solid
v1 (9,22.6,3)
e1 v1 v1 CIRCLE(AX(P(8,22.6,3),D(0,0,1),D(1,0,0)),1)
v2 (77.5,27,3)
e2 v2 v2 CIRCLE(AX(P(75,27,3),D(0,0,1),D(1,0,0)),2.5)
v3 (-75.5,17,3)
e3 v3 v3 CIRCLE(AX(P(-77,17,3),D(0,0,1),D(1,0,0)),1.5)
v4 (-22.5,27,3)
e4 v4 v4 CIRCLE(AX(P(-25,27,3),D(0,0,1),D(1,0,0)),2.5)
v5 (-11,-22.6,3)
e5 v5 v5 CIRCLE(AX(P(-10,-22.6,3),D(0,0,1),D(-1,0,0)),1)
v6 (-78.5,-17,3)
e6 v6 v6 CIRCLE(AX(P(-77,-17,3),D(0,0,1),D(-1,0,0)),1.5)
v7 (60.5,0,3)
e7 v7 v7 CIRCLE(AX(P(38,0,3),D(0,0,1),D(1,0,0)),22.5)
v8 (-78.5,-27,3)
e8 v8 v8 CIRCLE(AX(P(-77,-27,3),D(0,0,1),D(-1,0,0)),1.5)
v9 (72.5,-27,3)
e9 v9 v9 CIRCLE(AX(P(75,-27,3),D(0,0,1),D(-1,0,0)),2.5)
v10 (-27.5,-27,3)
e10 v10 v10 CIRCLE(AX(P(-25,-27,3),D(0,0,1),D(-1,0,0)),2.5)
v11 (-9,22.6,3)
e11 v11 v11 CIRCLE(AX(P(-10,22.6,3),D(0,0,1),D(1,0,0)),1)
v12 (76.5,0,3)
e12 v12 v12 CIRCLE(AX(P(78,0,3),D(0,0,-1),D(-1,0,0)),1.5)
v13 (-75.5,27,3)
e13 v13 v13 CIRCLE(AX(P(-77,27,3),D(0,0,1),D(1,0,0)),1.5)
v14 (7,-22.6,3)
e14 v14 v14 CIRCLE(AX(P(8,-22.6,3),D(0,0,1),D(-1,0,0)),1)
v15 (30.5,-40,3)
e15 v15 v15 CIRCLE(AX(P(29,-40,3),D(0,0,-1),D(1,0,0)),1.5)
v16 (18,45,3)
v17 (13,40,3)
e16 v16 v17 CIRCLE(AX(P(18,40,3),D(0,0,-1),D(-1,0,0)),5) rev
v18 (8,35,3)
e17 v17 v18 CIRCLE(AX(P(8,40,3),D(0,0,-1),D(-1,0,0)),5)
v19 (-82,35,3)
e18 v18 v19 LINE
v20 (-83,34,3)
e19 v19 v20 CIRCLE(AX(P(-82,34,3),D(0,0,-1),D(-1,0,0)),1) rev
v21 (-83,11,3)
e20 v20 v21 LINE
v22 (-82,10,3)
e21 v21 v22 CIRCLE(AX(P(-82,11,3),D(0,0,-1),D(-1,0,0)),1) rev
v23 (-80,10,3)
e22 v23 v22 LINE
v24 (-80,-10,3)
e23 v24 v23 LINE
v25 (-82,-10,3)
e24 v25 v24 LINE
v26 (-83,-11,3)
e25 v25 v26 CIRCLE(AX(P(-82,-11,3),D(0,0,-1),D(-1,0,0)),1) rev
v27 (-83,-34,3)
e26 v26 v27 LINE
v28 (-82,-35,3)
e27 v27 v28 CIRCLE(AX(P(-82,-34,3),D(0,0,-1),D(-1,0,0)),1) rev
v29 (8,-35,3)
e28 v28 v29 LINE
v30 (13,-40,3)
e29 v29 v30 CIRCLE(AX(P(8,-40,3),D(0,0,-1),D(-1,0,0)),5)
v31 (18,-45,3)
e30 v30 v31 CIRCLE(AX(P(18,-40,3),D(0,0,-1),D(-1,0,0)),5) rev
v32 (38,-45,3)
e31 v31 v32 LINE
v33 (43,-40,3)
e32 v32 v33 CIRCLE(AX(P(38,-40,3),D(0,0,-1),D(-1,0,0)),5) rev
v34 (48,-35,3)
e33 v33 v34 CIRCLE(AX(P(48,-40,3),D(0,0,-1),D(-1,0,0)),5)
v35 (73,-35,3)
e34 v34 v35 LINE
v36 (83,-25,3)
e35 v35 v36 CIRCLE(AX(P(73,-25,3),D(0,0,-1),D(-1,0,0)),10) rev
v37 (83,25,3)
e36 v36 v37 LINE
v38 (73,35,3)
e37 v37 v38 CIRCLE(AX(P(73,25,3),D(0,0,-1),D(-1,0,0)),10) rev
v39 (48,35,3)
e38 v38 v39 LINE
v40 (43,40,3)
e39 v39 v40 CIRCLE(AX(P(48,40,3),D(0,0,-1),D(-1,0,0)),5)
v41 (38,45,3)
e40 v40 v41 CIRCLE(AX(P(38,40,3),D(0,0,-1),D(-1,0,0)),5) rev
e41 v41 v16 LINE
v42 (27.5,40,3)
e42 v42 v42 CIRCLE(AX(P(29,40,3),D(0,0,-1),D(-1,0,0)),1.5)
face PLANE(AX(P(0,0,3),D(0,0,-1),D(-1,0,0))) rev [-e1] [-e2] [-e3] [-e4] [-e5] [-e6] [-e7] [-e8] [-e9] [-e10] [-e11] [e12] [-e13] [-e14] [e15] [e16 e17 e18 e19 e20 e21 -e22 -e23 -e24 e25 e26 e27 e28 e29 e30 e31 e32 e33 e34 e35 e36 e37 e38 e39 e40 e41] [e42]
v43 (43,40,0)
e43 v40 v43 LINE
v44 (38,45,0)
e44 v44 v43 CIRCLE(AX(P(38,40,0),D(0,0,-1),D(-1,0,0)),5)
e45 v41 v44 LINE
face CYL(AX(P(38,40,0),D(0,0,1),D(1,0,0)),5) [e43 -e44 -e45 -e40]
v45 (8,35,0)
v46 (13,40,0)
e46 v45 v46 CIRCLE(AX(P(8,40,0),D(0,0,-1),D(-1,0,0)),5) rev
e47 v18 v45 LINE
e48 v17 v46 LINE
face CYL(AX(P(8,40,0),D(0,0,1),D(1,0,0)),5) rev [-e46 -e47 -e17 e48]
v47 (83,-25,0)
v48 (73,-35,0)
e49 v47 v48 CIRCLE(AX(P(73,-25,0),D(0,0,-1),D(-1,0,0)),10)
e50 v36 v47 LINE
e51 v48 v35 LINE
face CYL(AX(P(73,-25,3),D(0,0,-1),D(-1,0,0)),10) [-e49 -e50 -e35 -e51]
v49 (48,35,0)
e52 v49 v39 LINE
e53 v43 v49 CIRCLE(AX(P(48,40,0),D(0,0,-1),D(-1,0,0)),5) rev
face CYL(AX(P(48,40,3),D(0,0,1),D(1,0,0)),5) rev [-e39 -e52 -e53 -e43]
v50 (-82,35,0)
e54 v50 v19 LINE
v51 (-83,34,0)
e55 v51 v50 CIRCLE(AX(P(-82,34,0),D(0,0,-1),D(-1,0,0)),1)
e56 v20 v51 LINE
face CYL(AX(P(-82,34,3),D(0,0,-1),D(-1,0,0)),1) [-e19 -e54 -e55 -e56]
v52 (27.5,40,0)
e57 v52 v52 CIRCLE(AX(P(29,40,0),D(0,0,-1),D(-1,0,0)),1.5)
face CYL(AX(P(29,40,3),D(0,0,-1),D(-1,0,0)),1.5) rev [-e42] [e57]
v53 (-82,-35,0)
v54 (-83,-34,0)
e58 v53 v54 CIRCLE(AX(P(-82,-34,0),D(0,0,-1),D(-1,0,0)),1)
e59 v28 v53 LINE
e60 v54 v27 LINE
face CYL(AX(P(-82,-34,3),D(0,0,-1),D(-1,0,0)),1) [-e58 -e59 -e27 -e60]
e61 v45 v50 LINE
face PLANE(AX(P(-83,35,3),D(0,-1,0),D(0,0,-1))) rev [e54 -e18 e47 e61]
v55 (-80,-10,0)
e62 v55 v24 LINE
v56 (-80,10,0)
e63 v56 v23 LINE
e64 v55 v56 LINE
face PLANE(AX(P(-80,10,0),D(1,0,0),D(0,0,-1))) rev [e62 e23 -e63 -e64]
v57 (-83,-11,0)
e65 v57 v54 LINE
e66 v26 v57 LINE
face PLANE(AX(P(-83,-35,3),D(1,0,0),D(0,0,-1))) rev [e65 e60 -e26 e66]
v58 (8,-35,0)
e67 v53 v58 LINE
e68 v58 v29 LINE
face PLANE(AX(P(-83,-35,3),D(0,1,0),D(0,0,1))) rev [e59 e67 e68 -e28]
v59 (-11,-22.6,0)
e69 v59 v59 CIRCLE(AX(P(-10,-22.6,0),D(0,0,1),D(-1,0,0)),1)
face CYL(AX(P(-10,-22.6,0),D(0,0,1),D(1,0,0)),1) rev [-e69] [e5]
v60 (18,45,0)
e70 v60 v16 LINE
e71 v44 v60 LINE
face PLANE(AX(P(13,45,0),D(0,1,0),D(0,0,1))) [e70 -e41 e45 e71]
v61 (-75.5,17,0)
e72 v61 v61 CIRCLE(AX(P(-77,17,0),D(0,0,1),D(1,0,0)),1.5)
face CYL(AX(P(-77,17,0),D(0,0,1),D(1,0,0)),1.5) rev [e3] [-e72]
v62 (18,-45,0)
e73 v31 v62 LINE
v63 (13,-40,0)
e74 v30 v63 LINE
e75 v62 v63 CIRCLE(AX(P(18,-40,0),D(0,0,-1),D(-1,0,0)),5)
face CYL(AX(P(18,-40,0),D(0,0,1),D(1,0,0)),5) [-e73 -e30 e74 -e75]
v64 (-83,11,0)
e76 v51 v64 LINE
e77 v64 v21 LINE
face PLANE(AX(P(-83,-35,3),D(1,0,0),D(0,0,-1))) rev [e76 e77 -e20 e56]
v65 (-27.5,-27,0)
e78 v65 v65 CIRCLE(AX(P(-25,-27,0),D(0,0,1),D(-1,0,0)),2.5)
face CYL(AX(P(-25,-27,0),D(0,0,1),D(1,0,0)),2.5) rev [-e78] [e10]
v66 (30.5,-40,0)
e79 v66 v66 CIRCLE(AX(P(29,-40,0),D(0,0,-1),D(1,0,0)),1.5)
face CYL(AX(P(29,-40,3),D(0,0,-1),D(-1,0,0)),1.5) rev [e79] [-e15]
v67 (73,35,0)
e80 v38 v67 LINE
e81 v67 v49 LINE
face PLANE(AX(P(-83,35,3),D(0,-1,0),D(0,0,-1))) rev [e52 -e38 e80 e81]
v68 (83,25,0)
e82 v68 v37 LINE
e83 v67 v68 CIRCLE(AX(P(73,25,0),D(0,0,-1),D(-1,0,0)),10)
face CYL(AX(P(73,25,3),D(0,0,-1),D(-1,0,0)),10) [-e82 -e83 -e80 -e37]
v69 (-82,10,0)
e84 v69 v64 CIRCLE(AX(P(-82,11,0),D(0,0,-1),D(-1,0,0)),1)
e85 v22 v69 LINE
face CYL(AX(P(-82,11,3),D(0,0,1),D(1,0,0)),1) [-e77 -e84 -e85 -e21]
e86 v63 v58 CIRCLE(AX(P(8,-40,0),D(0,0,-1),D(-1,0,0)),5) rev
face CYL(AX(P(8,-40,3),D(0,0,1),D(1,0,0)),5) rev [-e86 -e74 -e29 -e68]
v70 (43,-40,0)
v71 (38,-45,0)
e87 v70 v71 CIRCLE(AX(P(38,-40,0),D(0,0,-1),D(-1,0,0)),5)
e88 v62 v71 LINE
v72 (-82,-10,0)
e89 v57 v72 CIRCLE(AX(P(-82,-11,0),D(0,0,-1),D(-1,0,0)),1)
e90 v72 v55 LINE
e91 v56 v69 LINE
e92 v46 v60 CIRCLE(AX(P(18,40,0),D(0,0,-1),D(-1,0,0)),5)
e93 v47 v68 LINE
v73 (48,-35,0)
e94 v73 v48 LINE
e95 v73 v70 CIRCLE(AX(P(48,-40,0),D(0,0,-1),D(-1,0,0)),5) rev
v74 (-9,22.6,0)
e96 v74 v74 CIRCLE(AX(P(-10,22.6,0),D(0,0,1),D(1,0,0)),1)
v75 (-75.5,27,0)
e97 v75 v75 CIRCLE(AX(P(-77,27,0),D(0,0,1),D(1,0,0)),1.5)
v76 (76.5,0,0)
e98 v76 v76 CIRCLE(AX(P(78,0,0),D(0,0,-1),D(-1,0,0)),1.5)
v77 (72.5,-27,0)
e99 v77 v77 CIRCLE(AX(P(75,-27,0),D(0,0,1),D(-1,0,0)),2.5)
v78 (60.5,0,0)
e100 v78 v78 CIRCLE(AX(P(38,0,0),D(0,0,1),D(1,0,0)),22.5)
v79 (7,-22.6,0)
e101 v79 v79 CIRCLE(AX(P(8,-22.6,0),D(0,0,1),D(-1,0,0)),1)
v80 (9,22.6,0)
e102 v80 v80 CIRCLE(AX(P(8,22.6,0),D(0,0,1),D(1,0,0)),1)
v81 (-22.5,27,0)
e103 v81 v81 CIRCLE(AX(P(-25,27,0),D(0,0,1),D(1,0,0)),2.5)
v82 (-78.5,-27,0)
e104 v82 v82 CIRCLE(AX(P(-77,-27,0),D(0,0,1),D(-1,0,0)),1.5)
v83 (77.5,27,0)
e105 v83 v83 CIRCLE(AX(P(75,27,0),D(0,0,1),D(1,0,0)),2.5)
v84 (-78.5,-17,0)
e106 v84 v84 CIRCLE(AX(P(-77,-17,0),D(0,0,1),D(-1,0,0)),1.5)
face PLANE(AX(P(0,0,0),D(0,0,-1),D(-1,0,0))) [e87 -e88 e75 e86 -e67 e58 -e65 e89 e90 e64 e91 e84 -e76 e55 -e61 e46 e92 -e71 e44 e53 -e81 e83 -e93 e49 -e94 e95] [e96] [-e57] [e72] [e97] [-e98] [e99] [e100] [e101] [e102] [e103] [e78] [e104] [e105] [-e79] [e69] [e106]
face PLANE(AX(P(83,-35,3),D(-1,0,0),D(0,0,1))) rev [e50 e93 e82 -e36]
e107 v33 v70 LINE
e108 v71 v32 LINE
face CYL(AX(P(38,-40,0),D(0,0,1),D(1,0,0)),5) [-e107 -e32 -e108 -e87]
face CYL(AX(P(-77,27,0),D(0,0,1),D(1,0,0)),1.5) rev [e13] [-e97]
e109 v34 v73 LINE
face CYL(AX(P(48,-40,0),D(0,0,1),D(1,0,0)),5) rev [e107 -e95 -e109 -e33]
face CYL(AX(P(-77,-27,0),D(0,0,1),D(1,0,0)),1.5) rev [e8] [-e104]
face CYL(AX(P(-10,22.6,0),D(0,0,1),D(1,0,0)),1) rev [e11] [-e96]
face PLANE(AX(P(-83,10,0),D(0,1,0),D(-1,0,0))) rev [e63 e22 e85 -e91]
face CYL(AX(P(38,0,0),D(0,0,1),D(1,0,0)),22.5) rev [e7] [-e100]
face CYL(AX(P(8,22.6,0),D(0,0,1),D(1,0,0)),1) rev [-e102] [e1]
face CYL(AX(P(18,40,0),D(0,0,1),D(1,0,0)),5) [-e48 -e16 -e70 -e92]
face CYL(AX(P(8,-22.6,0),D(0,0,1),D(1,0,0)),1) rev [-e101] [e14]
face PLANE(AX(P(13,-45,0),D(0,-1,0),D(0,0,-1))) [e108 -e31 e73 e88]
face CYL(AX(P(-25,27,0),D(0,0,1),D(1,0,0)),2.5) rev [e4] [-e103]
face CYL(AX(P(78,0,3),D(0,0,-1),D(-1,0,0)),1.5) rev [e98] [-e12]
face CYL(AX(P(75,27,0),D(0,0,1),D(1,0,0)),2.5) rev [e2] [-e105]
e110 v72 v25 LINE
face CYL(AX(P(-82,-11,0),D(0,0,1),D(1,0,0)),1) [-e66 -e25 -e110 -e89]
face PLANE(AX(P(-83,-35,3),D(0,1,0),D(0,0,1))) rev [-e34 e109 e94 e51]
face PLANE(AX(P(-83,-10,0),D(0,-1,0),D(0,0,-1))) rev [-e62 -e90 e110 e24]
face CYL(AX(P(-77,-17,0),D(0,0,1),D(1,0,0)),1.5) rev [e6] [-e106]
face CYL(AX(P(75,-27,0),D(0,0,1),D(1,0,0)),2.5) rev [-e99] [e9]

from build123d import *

# Parameters (mm, degrees)
SKETCH_1_W          = 166
SKETCH_1_H          = 70
EXTRUDE_1_DEPTH     = 3
SKETCH_2_W          = 3
SKETCH_2_H          = 20
CUT_EXTRUDE_1_DEPTH = 91.1276872
SKETCH_3_R          = 1.5
CUT_EXTRUDE_2_DEPTH = 91.1276872
SKETCH_4_R          = 1
CUT_EXTRUDE_3_DEPTH = 91.1276872
FILLET_1_R          = 1
SKETCH_5_R          = 22.5
CUT_EXTRUDE_4_DEPTH = 91.1276872
SKETCH_6_R          = 2.5
CUT_EXTRUDE_5_DEPTH = 91.1276872
FILLET_2_R          = 10
SKETCH_7_W          = 30
SKETCH_7_H          = 10
EXTRUDE_2_DEPTH     = 3
FILLET_START        = -1
FILLET_3_DEPTH      = 5
FILLET_3_2_DEPTH    = 3
SKETCH_8_R          = 1.5
CUT_EXTRUDE_6_DEPTH = 95.461632423
SKETCH_9_R          = 1.5
CUT_EXTRUDE_7_DEPTH = 95.461632423


with BuildPart() as part:
    # 草图1 → 凸台-拉伸1 (new body)
    with BuildSketch(Plane.XY):
        Rectangle(SKETCH_1_W, SKETCH_1_H)
    extrude(amount=EXTRUDE_1_DEPTH)

    # 草图2 → 切除-拉伸1 (cut, through all)
    with BuildSketch(Plane.XY.offset(3)):
        with Locations((-81.5, 0)):
            Rectangle(SKETCH_2_W, SKETCH_2_H)
    extrude(amount=-CUT_EXTRUDE_1_DEPTH, mode=Mode.SUBTRACT)

    # 草图3 → 切除-拉伸2 (cut, through all)
    with BuildSketch(Plane.XY.offset(3)):
        with Locations((-77, 27)):
            Circle(SKETCH_3_R)
        with Locations((-77, 17)):
            Circle(SKETCH_3_R)
        with Locations(Location((-77, -17, 0), (0, 0, 180))):
            Circle(SKETCH_3_R)
        with Locations(Location((-77, -27, 0), (0, 0, 180))):
            Circle(SKETCH_3_R)
    extrude(amount=-CUT_EXTRUDE_2_DEPTH, mode=Mode.SUBTRACT)

    # 草图4 → 切除-拉伸3 (cut, through all)
    with BuildSketch(Plane.XY.offset(3)):
        with Locations((-10, 22.6)):
            Circle(SKETCH_4_R)
        with Locations((8, 22.6)):
            Circle(SKETCH_4_R)
        with Locations(Location((8, -22.6, 0), (0, 0, 180))):
            Circle(SKETCH_4_R)
        with Locations(Location((-10, -22.6, 0), (0, 0, 180))):
            Circle(SKETCH_4_R)
    extrude(amount=-CUT_EXTRUDE_3_DEPTH, mode=Mode.SUBTRACT)

    # 圆角1
    fillet_1_edges = [part.edges().sort_by_distance(p)[0] for p in [
        (-83, -10, 1.5),
        (-83, 10, 1.5),
        (-83, -35, 1.5),
        (-83, 35, 1.5),
    ]]
    fillet(fillet_1_edges, radius=FILLET_1_R)

    # 草图5 → 切除-拉伸4 (cut, through all)
    with BuildSketch(Plane.XY.offset(3)):
        with Locations((38, 0)):
            Circle(SKETCH_5_R)
    extrude(amount=-CUT_EXTRUDE_4_DEPTH, mode=Mode.SUBTRACT)

    # 草图6 → 切除-拉伸5 (cut, through all)
    with BuildSketch(Plane.XY.offset(3)):
        with Locations((75, 27)):
            Circle(SKETCH_6_R)
        with Locations((-25, 27)):
            Circle(SKETCH_6_R)
        with Locations(Location((75, -27, 0), (0, 0, 180))):
            Circle(SKETCH_6_R)
        with Locations(Location((-25, -27, 0), (0, 0, 180))):
            Circle(SKETCH_6_R)
    extrude(amount=-CUT_EXTRUDE_5_DEPTH, mode=Mode.SUBTRACT)

    # 圆角2
    fillet_2_edges = [part.edges().sort_by_distance(p)[0] for p in [
        (83, -35, 1.5),
        (83, 35, 1.5),
    ]]
    fillet(fillet_2_edges, radius=FILLET_2_R)

    # 草图7 → 凸台-拉伸2 (add)
    with BuildSketch(Plane.XY.offset(3)):
        with Locations((28, 40)):
            Rectangle(SKETCH_7_W, SKETCH_7_H)
        with Locations((28, -40)):
            Rectangle(SKETCH_7_W, SKETCH_7_H)
    extrude(amount=-EXTRUDE_2_DEPTH)

    # 圆角3: read off the stored shape, not the designer's step
    # 圆角3 outline → 圆角3 (cut)
    with BuildSketch(Plane.XY.offset(FILLET_START)):
        with BuildLine():
            Line((13, -45), (18, -45))
            ThreePointArc((18, -45), (14.464466094, -43.535533906), (13, -40))
            Line((13, -40), (13, -45))
        make_face()
        with BuildLine():
            ThreePointArc((43, -40), (41.535533906, -43.535533906), (38, -45))
            Line((38, -45), (43, -45))
            Line((43, -45), (43, -40))
        make_face()
        with BuildLine():
            Line((43, 45), (38, 45))
            ThreePointArc((38, 45), (41.535533906, 43.535533906), (43, 40))
            Line((43, 40), (43, 45))
        make_face()
        with BuildLine():
            ThreePointArc((13, 40), (14.464466094, 43.535533906), (18, 45))
            Line((18, 45), (13, 45))
            Line((13, 45), (13, 40))
        make_face()
    extrude(amount=FILLET_3_DEPTH, mode=Mode.SUBTRACT)

    # Fillet 3 2 outline → Fillet 3 2 (add)
    with BuildSketch(Plane.XY):
        with BuildLine():
            Line((43, -35), (43, -40))
            ThreePointArc((43, -40), (44.464466094, -36.464466094), (48, -35))
            Line((48, -35), (43, -35))
        make_face()
        with BuildLine():
            ThreePointArc((8, -35), (11.535533906, -36.464466094), (13, -40))
            Line((13, -40), (13, -35))
            Line((13, -35), (8, -35))
        make_face()
        with BuildLine():
            Line((13, 35), (13, 40))
            ThreePointArc((13, 40), (11.535533906, 36.464466094), (8, 35))
            Line((8, 35), (13, 35))
        make_face()
        with BuildLine():
            ThreePointArc((48, 35), (44.464466094, 36.464466094), (43, 40))
            Line((43, 40), (43, 35))
            Line((43, 35), (48, 35))
        make_face()
    extrude(amount=FILLET_3_2_DEPTH)

    # 草图8 → 切除-拉伸6 (cut, through all)
    with BuildSketch(Plane(origin=(0, 0, 0), x_dir=(-1, 0, 0), z_dir=(0, 0, -1))):
        with Locations((-78, 0)):
            Circle(SKETCH_8_R)
    extrude(amount=-CUT_EXTRUDE_6_DEPTH, mode=Mode.SUBTRACT)

    # 草图9 → 切除-拉伸7 (cut, through all)
    with BuildSketch(Plane(origin=(0, 0, 0), x_dir=(-1, 0, 0), z_dir=(0, 0, -1))):
        with Locations((-29, 40)):
            Circle(SKETCH_9_R)
        with Locations(Location((-29, -40, 0), (0, 0, 180))):
            Circle(SKETCH_9_R)
    extrude(amount=-CUT_EXTRUDE_7_DEPTH, mode=Mode.SUBTRACT)


solid = part.part
